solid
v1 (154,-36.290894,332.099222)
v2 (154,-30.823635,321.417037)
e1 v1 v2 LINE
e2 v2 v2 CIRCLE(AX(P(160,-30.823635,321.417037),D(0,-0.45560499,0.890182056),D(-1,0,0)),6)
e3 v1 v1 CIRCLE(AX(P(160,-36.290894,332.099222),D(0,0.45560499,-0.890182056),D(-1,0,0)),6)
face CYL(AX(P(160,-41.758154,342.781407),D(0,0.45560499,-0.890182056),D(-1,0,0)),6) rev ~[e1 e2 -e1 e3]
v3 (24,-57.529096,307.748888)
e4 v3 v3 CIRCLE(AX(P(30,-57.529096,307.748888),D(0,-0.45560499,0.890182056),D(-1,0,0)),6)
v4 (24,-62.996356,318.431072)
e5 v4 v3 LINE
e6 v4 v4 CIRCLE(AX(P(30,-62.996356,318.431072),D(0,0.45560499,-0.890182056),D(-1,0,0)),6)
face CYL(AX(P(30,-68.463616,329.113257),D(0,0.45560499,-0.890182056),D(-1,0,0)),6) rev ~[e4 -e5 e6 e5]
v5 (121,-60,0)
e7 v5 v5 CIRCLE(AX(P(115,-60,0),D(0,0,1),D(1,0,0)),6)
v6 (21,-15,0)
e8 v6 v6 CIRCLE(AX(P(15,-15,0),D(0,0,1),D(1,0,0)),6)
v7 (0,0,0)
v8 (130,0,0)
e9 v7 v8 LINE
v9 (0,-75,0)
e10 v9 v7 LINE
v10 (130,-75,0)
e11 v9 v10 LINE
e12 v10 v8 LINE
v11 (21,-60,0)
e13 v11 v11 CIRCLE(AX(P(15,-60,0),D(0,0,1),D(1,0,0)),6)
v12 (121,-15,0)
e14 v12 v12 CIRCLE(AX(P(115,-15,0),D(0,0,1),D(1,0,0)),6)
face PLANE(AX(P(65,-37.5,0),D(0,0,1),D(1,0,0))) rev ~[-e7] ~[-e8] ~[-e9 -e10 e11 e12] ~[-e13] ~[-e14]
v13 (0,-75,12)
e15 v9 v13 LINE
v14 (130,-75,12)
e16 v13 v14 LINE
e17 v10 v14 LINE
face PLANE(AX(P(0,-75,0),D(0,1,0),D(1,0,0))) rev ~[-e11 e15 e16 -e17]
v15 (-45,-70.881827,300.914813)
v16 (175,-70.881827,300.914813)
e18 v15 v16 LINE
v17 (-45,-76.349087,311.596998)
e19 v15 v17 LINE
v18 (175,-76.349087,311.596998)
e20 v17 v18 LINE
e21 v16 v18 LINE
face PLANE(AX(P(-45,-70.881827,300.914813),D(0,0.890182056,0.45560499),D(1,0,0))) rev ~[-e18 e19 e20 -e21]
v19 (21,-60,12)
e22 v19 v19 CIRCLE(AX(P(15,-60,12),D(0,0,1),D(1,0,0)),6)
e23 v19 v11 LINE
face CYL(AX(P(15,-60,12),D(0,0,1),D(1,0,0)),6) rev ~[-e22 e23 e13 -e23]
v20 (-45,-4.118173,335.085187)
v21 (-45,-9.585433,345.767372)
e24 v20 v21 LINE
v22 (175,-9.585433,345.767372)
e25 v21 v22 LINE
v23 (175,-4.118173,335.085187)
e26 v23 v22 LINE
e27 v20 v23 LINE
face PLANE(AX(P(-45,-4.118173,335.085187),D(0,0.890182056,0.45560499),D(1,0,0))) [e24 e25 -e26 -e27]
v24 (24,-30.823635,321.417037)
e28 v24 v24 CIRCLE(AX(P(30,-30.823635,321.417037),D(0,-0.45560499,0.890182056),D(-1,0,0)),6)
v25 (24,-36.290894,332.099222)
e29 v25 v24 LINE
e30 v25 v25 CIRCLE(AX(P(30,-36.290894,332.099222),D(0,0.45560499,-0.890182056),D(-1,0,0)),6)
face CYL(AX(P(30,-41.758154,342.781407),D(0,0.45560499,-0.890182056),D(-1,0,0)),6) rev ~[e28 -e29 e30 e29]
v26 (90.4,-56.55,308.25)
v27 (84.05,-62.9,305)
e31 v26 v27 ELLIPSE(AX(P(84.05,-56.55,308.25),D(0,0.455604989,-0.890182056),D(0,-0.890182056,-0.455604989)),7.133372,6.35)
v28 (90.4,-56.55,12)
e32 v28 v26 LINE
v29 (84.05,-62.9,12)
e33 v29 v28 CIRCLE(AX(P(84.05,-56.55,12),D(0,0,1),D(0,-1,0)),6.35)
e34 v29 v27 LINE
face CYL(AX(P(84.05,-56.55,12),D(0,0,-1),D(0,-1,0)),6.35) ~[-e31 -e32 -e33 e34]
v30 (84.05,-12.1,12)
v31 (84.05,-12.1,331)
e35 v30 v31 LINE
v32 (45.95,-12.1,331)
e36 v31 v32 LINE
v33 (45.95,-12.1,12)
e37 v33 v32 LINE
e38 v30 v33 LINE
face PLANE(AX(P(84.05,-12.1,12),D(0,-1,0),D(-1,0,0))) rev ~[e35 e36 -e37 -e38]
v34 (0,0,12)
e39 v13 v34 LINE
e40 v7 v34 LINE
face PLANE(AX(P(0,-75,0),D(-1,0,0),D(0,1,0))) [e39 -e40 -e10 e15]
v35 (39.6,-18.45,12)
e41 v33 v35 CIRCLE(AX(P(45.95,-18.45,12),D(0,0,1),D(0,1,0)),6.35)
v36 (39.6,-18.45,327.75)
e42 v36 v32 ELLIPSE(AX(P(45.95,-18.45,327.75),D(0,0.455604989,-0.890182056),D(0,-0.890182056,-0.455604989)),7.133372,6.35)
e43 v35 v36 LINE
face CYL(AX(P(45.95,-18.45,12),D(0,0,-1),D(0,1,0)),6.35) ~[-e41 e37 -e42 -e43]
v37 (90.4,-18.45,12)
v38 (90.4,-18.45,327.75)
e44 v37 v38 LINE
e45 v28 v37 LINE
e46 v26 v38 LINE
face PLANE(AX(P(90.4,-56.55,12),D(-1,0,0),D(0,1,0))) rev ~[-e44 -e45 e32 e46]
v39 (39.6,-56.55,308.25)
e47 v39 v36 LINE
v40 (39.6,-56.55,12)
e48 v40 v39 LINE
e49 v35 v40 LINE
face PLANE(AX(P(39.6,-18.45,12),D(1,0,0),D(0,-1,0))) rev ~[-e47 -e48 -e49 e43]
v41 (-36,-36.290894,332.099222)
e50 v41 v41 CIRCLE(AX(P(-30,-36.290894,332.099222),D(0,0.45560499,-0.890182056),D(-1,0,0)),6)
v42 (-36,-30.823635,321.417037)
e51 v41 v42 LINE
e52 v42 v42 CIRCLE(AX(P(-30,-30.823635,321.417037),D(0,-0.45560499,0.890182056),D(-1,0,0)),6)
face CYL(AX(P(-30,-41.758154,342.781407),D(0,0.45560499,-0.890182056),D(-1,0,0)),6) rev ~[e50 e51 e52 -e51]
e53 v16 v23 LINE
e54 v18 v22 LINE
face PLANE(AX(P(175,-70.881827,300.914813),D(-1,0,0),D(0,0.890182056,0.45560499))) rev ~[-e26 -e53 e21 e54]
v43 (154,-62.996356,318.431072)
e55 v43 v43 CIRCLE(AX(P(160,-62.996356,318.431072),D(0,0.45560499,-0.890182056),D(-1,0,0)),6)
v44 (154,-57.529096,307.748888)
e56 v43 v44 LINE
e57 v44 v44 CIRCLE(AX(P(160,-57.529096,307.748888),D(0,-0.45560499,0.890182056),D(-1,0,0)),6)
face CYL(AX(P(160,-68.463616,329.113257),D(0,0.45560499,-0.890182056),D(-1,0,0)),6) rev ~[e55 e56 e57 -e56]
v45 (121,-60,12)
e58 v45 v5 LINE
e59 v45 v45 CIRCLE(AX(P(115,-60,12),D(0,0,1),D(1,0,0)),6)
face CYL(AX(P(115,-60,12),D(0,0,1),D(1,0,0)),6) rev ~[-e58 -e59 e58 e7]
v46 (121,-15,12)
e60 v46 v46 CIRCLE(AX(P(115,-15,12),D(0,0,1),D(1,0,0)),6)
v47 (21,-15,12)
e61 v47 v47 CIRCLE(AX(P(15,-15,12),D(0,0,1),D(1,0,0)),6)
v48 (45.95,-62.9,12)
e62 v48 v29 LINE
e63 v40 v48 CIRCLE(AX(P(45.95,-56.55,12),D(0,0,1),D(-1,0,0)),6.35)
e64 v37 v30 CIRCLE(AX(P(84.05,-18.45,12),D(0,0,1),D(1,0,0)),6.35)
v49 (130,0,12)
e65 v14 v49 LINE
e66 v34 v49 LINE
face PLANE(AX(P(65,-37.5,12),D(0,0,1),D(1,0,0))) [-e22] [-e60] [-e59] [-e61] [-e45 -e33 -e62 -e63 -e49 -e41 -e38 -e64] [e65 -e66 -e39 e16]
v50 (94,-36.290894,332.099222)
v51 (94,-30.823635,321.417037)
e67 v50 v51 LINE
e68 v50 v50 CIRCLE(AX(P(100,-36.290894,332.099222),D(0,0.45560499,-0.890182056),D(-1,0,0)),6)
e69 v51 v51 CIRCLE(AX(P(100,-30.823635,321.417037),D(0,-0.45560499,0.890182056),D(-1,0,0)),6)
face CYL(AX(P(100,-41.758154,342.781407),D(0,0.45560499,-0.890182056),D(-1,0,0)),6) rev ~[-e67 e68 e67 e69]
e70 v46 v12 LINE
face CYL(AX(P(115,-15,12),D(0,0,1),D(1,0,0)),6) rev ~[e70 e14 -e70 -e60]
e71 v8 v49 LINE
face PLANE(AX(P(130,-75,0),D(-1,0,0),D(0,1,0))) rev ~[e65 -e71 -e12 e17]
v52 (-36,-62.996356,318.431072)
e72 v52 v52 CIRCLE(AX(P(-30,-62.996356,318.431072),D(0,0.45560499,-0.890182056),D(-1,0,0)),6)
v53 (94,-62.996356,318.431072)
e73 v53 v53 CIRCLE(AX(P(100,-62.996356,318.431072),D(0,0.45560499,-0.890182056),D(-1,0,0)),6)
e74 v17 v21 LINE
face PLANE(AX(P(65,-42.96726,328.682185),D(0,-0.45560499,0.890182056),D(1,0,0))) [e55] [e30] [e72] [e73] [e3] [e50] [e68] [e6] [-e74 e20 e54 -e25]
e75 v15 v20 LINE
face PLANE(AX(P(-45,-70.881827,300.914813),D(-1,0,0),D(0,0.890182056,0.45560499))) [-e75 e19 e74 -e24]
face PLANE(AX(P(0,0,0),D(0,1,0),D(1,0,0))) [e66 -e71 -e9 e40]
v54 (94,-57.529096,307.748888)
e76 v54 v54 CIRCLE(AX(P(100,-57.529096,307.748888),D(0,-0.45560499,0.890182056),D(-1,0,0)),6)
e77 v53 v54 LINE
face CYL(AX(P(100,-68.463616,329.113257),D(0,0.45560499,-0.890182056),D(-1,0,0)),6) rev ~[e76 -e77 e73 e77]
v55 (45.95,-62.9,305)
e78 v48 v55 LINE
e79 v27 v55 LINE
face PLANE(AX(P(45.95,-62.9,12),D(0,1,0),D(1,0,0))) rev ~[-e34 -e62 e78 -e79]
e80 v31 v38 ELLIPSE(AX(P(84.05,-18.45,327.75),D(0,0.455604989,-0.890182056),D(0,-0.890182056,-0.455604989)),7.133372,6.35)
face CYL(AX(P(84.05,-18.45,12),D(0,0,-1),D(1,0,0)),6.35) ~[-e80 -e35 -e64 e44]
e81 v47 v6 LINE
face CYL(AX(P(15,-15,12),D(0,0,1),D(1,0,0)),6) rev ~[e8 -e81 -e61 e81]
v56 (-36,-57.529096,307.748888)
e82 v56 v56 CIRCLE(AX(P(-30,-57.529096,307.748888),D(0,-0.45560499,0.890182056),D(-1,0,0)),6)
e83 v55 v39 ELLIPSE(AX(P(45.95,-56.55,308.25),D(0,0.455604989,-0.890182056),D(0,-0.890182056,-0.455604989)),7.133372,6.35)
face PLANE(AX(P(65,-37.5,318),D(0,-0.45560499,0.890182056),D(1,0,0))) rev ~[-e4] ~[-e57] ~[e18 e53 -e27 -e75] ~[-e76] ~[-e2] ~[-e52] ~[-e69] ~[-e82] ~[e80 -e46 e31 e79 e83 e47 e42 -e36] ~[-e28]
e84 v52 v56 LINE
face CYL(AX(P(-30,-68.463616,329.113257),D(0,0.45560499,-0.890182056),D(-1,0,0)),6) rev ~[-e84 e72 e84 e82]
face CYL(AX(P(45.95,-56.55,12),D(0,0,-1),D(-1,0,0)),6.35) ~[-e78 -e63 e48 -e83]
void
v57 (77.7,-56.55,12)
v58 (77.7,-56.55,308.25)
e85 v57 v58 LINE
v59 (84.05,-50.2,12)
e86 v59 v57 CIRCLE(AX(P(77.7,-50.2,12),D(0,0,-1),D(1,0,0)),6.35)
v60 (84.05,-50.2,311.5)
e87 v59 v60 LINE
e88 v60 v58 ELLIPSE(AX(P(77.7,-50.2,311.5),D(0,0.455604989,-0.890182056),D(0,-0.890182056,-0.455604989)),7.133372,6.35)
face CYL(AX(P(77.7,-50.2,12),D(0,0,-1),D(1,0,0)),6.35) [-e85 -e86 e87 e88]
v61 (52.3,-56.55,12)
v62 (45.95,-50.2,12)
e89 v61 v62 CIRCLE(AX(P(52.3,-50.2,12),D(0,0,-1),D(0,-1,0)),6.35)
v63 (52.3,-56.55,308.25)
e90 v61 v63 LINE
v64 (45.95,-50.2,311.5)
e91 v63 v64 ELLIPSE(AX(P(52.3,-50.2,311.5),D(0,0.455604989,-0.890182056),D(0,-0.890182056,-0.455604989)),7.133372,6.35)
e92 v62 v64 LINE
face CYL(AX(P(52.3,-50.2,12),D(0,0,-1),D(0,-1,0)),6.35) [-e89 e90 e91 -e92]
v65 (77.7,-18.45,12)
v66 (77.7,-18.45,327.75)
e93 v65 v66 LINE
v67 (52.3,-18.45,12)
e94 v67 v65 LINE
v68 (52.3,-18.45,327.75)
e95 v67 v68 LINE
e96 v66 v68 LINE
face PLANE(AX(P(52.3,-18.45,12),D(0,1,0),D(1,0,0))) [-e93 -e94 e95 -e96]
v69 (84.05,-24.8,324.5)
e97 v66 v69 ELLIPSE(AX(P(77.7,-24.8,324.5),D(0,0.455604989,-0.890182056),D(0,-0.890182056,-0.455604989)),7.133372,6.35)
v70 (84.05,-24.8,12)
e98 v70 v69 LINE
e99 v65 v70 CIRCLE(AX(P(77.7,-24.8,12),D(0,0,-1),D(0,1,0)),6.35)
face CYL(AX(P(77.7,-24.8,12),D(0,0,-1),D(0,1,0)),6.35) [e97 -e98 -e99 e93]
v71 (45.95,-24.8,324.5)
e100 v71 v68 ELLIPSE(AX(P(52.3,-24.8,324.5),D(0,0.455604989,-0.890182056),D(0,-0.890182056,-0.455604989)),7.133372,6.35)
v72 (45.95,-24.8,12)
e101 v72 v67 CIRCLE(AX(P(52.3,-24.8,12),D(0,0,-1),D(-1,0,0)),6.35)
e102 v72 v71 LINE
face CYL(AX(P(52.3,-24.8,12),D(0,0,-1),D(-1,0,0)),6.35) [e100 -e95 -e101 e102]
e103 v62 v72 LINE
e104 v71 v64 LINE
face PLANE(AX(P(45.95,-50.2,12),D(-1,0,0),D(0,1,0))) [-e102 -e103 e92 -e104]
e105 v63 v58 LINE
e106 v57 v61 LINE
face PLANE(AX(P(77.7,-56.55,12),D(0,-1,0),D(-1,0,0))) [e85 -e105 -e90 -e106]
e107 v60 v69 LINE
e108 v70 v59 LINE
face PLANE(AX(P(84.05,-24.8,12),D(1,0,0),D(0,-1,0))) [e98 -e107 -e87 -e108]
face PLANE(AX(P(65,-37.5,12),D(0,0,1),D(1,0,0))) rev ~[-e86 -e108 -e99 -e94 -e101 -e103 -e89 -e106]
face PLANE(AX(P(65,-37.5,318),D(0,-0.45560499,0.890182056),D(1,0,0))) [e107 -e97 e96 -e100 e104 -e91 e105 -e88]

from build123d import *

# Parameters (mm, degrees)
F0_W      = 130
F0_H      = 75
F1_DEPTH  = 12
F3_DEPTH  = 319
F5_DEPTH  = 100
F6_W      = 220
F6_H      = 75
F7_DEPTH  = 12
F9_D      = 12
F9_DEPTH  = 12
F9_TIP    = 3.6051637142
F11_D     = 12
F11_DEPTH = 12
F11_TIP   = 3.6051637142


# Not quite as in the source:
# - a feature names something its author has since deleted; it is built from what else it names


with BuildPart() as f1:
    # F0 (on Top) → F1 (new body)
    with BuildSketch(Plane.XY):
        with Locations((65, -37.5)):
            Rectangle(F0_W, F0_H)
    extrude(amount=F1_DEPTH)

    # F2 (on face) → F3 (join)
    with BuildSketch(Plane.XY.offset(12)):
        with BuildLine():
            ThreePointArc((90.4, -18.45), (88.5401280605, -13.9598719395), (84.05, -12.1))
            Line((84.05, -12.1), (45.95, -12.1))
            ThreePointArc((45.95, -12.1), (41.4598719395, -13.9598719395), (39.6, -18.45))
            Line((39.6, -18.45), (39.6, -56.55))
            ThreePointArc((39.6, -56.55), (41.4598719395, -61.0401280605), (45.95, -62.9))
            Line((45.95, -62.9), (84.05, -62.9))
            ThreePointArc((84.05, -62.9), (88.5401280605, -61.0401280605), (90.4, -56.55))
            Line((90.4, -56.55), (90.4, -18.45))
        make_face()
        with BuildLine():
            Line((52.3, -18.45), (77.7, -18.45))
            ThreePointArc((77.7, -18.45), (82.1901280605, -20.3098719395), (84.05, -24.8))
            Line((84.05, -24.8), (84.05, -50.2))
            ThreePointArc((84.05, -50.2), (82.1901280605, -54.6901280605), (77.7, -56.55))
            Line((77.7, -56.55), (52.3, -56.55))
            ThreePointArc((52.3, -56.55), (47.8098719395, -54.6901280605), (45.95, -50.2))
            Line((45.95, -50.2), (45.95, -24.8))
            ThreePointArc((45.95, -24.8), (47.8098719395, -20.3098719395), (52.3, -18.45))
        make_face(mode=Mode.SUBTRACT)
    extrude(amount=F3_DEPTH)

    # F4 (on face) → F5 (cut)
    with BuildSketch(Plane.YZ.offset(90.4)):
        Polygon((-62.9, 305), (-12.1, 331), (-62.9, 331), align=None)
    extrude(amount=-F5_DEPTH, mode=Mode.SUBTRACT)

    # F6 (on face) → F7 (join)
    with BuildSketch(Plane(origin=(0, -136.7557973863, 267.1997887393), x_dir=(1, 0, 0), z_dir=(0, -0.4556049895, 0.8901820564))):
        with Locations((65, 111.5005595453)):
            Rectangle(F6_W, F6_H)
        with BuildLine():
            Line((90.4, 132.9006763674), (90.4, 90.1004427232))
            add(Edge.make_bspline(
                [(90.4, 90.1004427232), (90.4, 82.9670704491), (84.05, 82.9670704491)],
                knots=[4.7123889804, 4.7123889804, 4.7123889804, 6.2831853072, 6.2831853072, 6.2831853072], degree=2, weights=[1, 0.7071067812, 1]))
            Line((84.05, 82.9670704491), (45.95, 82.9670704491))
            add(Edge.make_bspline(
                [(45.95, 82.9670704491), (39.6, 82.9670704491), (39.6, 90.1004427232)],
                knots=[0, 0, 0, 1.5707963268, 1.5707963268, 1.5707963268], degree=2, weights=[1, 0.7071067812, 1]))
            Line((39.6, 90.1004427232), (39.6, 132.9006763674))
            add(Edge.make_bspline(
                [(39.6, 132.9006763674), (39.6, 140.0340486414), (45.95, 140.0340486414)],
                knots=[1.5707963268, 1.5707963268, 1.5707963268, 3.1415926536, 3.1415926536, 3.1415926536], degree=2, weights=[1, 0.7071067812, 1]))
            Line((45.95, 140.0340486414), (84.05, 140.0340486414))
            add(Edge.make_bspline(
                [(84.05, 140.0340486414), (90.4, 140.0340486414), (90.4, 132.9006763674)],
                knots=[3.1415926536, 3.1415926536, 3.1415926536, 4.7123889804, 4.7123889804, 4.7123889804], degree=2, weights=[1, 0.7071067812, 1]))
        make_face(mode=Mode.SUBTRACT)
        with BuildLine():
            add(Edge.make_bspline(
                [(90.4, 90.1004427232), (90.4, 82.9670704491), (84.05, 82.9670704491)],
                knots=[4.7123889804, 4.7123889804, 4.7123889804, 6.2831853072, 6.2831853072, 6.2831853072], degree=2, weights=[1, 0.7071067812, 1]))
            Line((90.4, 90.1004427232), (90.4, 132.9006763674))
            add(Edge.make_bspline(
                [(84.05, 140.0340486414), (90.4, 140.0340486414), (90.4, 132.9006763674)],
                knots=[3.1415926536, 3.1415926536, 3.1415926536, 4.7123889804, 4.7123889804, 4.7123889804], degree=2, weights=[1, 0.7071067812, 1]))
            Line((84.05, 140.0340486414), (45.95, 140.0340486414))
            add(Edge.make_bspline(
                [(39.6, 132.9006763674), (39.6, 140.0340486414), (45.95, 140.0340486414)],
                knots=[1.5707963268, 1.5707963268, 1.5707963268, 3.1415926536, 3.1415926536, 3.1415926536], degree=2, weights=[1, 0.7071067812, 1]))
            Line((39.6, 132.9006763674), (39.6, 90.1004427232))
            add(Edge.make_bspline(
                [(45.95, 82.9670704491), (39.6, 82.9670704491), (39.6, 90.1004427232)],
                knots=[0, 0, 0, 1.5707963268, 1.5707963268, 1.5707963268], degree=2, weights=[1, 0.7071067812, 1]))
            Line((45.95, 82.9670704491), (84.05, 82.9670704491))
        make_face()
        with BuildLine():
            Line((52.3, 132.9006763674), (77.7, 132.9006763674))
            add(Edge.make_bspline(
                [(77.7, 132.9006763674), (84.05, 132.9006763674), (84.05, 125.7673040934)],
                knots=[3.1415926536, 3.1415926536, 3.1415926536, 4.7123889804, 4.7123889804, 4.7123889804], degree=2, weights=[1, 0.7071067812, 1]))
            Line((84.05, 125.7673040934), (84.05, 97.2338149972))
            add(Edge.make_bspline(
                [(84.05, 97.2338149972), (84.05, 90.1004427232), (77.7, 90.1004427232)],
                knots=[4.7123889804, 4.7123889804, 4.7123889804, 6.2831853072, 6.2831853072, 6.2831853072], degree=2, weights=[1, 0.7071067812, 1]))
            Line((77.7, 90.1004427232), (52.3, 90.1004427232))
            add(Edge.make_bspline(
                [(52.3, 90.1004427232), (45.95, 90.1004427232), (45.95, 97.2338149972)],
                knots=[0, 0, 0, 1.5707963268, 1.5707963268, 1.5707963268], degree=2, weights=[1, 0.7071067812, 1]))
            Line((45.95, 97.2338149972), (45.95, 125.7673040934))
            add(Edge.make_bspline(
                [(45.95, 125.7673040934), (45.95, 132.9006763674), (52.3, 132.9006763674)],
                knots=[1.5707963268, 1.5707963268, 1.5707963268, 3.1415926536, 3.1415926536, 3.1415926536], degree=2, weights=[1, 0.7071067812, 1]))
        make_face(mode=Mode.SUBTRACT)
        with BuildLine():
            add(Edge.make_bspline(
                [(77.7, 132.9006763674), (84.05, 132.9006763674), (84.05, 125.7673040934)],
                knots=[3.1415926536, 3.1415926536, 3.1415926536, 4.7123889804, 4.7123889804, 4.7123889804], degree=2, weights=[1, 0.7071067812, 1]))
            Line((77.7, 132.9006763674), (52.3, 132.9006763674))
            add(Edge.make_bspline(
                [(45.95, 125.7673040934), (45.95, 132.9006763674), (52.3, 132.9006763674)],
                knots=[1.5707963268, 1.5707963268, 1.5707963268, 3.1415926536, 3.1415926536, 3.1415926536], degree=2, weights=[1, 0.7071067812, 1]))
            Line((45.95, 125.7673040934), (45.95, 97.2338149972))
            add(Edge.make_bspline(
                [(52.3, 90.1004427232), (45.95, 90.1004427232), (45.95, 97.2338149972)],
                knots=[0, 0, 0, 1.5707963268, 1.5707963268, 1.5707963268], degree=2, weights=[1, 0.7071067812, 1]))
            Line((52.3, 90.1004427232), (77.7, 90.1004427232))
            add(Edge.make_bspline(
                [(84.05, 97.2338149972), (84.05, 90.1004427232), (77.7, 90.1004427232)],
                knots=[4.7123889804, 4.7123889804, 4.7123889804, 6.2831853072, 6.2831853072, 6.2831853072], degree=2, weights=[1, 0.7071067812, 1]))
            Line((84.05, 97.2338149972), (84.05, 125.7673040934))
        make_face()
    extrude(amount=F7_DEPTH)

    # F9
    with Locations(Plane(origin=(0, -142.2230572602, 277.8819734162), x_dir=(1, 0, 0), z_dir=(0, -0.4556049895, 0.8901820564))):
        with Locations((-30, 89.0005595453), (100, 89.0005595453), (160, 89.0005595453), (160, 119.0005595453), (100, 119.0005595453), (30, 119.0005595453), (-30, 119.0005595453), (30, 89.0005595453)):
            Hole(F9_D / 2, depth=F9_DEPTH)
            with Locations((0, 0, -(F9_DEPTH + F9_TIP / 2))):  # 118° drill point
                Cone(0, F9_D / 2, F9_TIP, mode=Mode.SUBTRACT)

    # F11 (one way)
    with BuildSketch(Plane.XY.offset(12)):
        with Locations((15, -15), (15, -60), (115, -60), (115, -15)):
            Circle(F11_D / 2)
    extrude(amount=-F11_DEPTH, mode=Mode.SUBTRACT)
    with Locations(Plane.XY.offset(12)):
        with Locations((15, -15), (15, -60), (115, -60), (115, -15)):
            with Locations((0, 0, -(F11_DEPTH + F11_TIP / 2))):  # 118° drill point
                Cone(0, F11_D / 2, F11_TIP, mode=Mode.SUBTRACT)


solid = f1.part
